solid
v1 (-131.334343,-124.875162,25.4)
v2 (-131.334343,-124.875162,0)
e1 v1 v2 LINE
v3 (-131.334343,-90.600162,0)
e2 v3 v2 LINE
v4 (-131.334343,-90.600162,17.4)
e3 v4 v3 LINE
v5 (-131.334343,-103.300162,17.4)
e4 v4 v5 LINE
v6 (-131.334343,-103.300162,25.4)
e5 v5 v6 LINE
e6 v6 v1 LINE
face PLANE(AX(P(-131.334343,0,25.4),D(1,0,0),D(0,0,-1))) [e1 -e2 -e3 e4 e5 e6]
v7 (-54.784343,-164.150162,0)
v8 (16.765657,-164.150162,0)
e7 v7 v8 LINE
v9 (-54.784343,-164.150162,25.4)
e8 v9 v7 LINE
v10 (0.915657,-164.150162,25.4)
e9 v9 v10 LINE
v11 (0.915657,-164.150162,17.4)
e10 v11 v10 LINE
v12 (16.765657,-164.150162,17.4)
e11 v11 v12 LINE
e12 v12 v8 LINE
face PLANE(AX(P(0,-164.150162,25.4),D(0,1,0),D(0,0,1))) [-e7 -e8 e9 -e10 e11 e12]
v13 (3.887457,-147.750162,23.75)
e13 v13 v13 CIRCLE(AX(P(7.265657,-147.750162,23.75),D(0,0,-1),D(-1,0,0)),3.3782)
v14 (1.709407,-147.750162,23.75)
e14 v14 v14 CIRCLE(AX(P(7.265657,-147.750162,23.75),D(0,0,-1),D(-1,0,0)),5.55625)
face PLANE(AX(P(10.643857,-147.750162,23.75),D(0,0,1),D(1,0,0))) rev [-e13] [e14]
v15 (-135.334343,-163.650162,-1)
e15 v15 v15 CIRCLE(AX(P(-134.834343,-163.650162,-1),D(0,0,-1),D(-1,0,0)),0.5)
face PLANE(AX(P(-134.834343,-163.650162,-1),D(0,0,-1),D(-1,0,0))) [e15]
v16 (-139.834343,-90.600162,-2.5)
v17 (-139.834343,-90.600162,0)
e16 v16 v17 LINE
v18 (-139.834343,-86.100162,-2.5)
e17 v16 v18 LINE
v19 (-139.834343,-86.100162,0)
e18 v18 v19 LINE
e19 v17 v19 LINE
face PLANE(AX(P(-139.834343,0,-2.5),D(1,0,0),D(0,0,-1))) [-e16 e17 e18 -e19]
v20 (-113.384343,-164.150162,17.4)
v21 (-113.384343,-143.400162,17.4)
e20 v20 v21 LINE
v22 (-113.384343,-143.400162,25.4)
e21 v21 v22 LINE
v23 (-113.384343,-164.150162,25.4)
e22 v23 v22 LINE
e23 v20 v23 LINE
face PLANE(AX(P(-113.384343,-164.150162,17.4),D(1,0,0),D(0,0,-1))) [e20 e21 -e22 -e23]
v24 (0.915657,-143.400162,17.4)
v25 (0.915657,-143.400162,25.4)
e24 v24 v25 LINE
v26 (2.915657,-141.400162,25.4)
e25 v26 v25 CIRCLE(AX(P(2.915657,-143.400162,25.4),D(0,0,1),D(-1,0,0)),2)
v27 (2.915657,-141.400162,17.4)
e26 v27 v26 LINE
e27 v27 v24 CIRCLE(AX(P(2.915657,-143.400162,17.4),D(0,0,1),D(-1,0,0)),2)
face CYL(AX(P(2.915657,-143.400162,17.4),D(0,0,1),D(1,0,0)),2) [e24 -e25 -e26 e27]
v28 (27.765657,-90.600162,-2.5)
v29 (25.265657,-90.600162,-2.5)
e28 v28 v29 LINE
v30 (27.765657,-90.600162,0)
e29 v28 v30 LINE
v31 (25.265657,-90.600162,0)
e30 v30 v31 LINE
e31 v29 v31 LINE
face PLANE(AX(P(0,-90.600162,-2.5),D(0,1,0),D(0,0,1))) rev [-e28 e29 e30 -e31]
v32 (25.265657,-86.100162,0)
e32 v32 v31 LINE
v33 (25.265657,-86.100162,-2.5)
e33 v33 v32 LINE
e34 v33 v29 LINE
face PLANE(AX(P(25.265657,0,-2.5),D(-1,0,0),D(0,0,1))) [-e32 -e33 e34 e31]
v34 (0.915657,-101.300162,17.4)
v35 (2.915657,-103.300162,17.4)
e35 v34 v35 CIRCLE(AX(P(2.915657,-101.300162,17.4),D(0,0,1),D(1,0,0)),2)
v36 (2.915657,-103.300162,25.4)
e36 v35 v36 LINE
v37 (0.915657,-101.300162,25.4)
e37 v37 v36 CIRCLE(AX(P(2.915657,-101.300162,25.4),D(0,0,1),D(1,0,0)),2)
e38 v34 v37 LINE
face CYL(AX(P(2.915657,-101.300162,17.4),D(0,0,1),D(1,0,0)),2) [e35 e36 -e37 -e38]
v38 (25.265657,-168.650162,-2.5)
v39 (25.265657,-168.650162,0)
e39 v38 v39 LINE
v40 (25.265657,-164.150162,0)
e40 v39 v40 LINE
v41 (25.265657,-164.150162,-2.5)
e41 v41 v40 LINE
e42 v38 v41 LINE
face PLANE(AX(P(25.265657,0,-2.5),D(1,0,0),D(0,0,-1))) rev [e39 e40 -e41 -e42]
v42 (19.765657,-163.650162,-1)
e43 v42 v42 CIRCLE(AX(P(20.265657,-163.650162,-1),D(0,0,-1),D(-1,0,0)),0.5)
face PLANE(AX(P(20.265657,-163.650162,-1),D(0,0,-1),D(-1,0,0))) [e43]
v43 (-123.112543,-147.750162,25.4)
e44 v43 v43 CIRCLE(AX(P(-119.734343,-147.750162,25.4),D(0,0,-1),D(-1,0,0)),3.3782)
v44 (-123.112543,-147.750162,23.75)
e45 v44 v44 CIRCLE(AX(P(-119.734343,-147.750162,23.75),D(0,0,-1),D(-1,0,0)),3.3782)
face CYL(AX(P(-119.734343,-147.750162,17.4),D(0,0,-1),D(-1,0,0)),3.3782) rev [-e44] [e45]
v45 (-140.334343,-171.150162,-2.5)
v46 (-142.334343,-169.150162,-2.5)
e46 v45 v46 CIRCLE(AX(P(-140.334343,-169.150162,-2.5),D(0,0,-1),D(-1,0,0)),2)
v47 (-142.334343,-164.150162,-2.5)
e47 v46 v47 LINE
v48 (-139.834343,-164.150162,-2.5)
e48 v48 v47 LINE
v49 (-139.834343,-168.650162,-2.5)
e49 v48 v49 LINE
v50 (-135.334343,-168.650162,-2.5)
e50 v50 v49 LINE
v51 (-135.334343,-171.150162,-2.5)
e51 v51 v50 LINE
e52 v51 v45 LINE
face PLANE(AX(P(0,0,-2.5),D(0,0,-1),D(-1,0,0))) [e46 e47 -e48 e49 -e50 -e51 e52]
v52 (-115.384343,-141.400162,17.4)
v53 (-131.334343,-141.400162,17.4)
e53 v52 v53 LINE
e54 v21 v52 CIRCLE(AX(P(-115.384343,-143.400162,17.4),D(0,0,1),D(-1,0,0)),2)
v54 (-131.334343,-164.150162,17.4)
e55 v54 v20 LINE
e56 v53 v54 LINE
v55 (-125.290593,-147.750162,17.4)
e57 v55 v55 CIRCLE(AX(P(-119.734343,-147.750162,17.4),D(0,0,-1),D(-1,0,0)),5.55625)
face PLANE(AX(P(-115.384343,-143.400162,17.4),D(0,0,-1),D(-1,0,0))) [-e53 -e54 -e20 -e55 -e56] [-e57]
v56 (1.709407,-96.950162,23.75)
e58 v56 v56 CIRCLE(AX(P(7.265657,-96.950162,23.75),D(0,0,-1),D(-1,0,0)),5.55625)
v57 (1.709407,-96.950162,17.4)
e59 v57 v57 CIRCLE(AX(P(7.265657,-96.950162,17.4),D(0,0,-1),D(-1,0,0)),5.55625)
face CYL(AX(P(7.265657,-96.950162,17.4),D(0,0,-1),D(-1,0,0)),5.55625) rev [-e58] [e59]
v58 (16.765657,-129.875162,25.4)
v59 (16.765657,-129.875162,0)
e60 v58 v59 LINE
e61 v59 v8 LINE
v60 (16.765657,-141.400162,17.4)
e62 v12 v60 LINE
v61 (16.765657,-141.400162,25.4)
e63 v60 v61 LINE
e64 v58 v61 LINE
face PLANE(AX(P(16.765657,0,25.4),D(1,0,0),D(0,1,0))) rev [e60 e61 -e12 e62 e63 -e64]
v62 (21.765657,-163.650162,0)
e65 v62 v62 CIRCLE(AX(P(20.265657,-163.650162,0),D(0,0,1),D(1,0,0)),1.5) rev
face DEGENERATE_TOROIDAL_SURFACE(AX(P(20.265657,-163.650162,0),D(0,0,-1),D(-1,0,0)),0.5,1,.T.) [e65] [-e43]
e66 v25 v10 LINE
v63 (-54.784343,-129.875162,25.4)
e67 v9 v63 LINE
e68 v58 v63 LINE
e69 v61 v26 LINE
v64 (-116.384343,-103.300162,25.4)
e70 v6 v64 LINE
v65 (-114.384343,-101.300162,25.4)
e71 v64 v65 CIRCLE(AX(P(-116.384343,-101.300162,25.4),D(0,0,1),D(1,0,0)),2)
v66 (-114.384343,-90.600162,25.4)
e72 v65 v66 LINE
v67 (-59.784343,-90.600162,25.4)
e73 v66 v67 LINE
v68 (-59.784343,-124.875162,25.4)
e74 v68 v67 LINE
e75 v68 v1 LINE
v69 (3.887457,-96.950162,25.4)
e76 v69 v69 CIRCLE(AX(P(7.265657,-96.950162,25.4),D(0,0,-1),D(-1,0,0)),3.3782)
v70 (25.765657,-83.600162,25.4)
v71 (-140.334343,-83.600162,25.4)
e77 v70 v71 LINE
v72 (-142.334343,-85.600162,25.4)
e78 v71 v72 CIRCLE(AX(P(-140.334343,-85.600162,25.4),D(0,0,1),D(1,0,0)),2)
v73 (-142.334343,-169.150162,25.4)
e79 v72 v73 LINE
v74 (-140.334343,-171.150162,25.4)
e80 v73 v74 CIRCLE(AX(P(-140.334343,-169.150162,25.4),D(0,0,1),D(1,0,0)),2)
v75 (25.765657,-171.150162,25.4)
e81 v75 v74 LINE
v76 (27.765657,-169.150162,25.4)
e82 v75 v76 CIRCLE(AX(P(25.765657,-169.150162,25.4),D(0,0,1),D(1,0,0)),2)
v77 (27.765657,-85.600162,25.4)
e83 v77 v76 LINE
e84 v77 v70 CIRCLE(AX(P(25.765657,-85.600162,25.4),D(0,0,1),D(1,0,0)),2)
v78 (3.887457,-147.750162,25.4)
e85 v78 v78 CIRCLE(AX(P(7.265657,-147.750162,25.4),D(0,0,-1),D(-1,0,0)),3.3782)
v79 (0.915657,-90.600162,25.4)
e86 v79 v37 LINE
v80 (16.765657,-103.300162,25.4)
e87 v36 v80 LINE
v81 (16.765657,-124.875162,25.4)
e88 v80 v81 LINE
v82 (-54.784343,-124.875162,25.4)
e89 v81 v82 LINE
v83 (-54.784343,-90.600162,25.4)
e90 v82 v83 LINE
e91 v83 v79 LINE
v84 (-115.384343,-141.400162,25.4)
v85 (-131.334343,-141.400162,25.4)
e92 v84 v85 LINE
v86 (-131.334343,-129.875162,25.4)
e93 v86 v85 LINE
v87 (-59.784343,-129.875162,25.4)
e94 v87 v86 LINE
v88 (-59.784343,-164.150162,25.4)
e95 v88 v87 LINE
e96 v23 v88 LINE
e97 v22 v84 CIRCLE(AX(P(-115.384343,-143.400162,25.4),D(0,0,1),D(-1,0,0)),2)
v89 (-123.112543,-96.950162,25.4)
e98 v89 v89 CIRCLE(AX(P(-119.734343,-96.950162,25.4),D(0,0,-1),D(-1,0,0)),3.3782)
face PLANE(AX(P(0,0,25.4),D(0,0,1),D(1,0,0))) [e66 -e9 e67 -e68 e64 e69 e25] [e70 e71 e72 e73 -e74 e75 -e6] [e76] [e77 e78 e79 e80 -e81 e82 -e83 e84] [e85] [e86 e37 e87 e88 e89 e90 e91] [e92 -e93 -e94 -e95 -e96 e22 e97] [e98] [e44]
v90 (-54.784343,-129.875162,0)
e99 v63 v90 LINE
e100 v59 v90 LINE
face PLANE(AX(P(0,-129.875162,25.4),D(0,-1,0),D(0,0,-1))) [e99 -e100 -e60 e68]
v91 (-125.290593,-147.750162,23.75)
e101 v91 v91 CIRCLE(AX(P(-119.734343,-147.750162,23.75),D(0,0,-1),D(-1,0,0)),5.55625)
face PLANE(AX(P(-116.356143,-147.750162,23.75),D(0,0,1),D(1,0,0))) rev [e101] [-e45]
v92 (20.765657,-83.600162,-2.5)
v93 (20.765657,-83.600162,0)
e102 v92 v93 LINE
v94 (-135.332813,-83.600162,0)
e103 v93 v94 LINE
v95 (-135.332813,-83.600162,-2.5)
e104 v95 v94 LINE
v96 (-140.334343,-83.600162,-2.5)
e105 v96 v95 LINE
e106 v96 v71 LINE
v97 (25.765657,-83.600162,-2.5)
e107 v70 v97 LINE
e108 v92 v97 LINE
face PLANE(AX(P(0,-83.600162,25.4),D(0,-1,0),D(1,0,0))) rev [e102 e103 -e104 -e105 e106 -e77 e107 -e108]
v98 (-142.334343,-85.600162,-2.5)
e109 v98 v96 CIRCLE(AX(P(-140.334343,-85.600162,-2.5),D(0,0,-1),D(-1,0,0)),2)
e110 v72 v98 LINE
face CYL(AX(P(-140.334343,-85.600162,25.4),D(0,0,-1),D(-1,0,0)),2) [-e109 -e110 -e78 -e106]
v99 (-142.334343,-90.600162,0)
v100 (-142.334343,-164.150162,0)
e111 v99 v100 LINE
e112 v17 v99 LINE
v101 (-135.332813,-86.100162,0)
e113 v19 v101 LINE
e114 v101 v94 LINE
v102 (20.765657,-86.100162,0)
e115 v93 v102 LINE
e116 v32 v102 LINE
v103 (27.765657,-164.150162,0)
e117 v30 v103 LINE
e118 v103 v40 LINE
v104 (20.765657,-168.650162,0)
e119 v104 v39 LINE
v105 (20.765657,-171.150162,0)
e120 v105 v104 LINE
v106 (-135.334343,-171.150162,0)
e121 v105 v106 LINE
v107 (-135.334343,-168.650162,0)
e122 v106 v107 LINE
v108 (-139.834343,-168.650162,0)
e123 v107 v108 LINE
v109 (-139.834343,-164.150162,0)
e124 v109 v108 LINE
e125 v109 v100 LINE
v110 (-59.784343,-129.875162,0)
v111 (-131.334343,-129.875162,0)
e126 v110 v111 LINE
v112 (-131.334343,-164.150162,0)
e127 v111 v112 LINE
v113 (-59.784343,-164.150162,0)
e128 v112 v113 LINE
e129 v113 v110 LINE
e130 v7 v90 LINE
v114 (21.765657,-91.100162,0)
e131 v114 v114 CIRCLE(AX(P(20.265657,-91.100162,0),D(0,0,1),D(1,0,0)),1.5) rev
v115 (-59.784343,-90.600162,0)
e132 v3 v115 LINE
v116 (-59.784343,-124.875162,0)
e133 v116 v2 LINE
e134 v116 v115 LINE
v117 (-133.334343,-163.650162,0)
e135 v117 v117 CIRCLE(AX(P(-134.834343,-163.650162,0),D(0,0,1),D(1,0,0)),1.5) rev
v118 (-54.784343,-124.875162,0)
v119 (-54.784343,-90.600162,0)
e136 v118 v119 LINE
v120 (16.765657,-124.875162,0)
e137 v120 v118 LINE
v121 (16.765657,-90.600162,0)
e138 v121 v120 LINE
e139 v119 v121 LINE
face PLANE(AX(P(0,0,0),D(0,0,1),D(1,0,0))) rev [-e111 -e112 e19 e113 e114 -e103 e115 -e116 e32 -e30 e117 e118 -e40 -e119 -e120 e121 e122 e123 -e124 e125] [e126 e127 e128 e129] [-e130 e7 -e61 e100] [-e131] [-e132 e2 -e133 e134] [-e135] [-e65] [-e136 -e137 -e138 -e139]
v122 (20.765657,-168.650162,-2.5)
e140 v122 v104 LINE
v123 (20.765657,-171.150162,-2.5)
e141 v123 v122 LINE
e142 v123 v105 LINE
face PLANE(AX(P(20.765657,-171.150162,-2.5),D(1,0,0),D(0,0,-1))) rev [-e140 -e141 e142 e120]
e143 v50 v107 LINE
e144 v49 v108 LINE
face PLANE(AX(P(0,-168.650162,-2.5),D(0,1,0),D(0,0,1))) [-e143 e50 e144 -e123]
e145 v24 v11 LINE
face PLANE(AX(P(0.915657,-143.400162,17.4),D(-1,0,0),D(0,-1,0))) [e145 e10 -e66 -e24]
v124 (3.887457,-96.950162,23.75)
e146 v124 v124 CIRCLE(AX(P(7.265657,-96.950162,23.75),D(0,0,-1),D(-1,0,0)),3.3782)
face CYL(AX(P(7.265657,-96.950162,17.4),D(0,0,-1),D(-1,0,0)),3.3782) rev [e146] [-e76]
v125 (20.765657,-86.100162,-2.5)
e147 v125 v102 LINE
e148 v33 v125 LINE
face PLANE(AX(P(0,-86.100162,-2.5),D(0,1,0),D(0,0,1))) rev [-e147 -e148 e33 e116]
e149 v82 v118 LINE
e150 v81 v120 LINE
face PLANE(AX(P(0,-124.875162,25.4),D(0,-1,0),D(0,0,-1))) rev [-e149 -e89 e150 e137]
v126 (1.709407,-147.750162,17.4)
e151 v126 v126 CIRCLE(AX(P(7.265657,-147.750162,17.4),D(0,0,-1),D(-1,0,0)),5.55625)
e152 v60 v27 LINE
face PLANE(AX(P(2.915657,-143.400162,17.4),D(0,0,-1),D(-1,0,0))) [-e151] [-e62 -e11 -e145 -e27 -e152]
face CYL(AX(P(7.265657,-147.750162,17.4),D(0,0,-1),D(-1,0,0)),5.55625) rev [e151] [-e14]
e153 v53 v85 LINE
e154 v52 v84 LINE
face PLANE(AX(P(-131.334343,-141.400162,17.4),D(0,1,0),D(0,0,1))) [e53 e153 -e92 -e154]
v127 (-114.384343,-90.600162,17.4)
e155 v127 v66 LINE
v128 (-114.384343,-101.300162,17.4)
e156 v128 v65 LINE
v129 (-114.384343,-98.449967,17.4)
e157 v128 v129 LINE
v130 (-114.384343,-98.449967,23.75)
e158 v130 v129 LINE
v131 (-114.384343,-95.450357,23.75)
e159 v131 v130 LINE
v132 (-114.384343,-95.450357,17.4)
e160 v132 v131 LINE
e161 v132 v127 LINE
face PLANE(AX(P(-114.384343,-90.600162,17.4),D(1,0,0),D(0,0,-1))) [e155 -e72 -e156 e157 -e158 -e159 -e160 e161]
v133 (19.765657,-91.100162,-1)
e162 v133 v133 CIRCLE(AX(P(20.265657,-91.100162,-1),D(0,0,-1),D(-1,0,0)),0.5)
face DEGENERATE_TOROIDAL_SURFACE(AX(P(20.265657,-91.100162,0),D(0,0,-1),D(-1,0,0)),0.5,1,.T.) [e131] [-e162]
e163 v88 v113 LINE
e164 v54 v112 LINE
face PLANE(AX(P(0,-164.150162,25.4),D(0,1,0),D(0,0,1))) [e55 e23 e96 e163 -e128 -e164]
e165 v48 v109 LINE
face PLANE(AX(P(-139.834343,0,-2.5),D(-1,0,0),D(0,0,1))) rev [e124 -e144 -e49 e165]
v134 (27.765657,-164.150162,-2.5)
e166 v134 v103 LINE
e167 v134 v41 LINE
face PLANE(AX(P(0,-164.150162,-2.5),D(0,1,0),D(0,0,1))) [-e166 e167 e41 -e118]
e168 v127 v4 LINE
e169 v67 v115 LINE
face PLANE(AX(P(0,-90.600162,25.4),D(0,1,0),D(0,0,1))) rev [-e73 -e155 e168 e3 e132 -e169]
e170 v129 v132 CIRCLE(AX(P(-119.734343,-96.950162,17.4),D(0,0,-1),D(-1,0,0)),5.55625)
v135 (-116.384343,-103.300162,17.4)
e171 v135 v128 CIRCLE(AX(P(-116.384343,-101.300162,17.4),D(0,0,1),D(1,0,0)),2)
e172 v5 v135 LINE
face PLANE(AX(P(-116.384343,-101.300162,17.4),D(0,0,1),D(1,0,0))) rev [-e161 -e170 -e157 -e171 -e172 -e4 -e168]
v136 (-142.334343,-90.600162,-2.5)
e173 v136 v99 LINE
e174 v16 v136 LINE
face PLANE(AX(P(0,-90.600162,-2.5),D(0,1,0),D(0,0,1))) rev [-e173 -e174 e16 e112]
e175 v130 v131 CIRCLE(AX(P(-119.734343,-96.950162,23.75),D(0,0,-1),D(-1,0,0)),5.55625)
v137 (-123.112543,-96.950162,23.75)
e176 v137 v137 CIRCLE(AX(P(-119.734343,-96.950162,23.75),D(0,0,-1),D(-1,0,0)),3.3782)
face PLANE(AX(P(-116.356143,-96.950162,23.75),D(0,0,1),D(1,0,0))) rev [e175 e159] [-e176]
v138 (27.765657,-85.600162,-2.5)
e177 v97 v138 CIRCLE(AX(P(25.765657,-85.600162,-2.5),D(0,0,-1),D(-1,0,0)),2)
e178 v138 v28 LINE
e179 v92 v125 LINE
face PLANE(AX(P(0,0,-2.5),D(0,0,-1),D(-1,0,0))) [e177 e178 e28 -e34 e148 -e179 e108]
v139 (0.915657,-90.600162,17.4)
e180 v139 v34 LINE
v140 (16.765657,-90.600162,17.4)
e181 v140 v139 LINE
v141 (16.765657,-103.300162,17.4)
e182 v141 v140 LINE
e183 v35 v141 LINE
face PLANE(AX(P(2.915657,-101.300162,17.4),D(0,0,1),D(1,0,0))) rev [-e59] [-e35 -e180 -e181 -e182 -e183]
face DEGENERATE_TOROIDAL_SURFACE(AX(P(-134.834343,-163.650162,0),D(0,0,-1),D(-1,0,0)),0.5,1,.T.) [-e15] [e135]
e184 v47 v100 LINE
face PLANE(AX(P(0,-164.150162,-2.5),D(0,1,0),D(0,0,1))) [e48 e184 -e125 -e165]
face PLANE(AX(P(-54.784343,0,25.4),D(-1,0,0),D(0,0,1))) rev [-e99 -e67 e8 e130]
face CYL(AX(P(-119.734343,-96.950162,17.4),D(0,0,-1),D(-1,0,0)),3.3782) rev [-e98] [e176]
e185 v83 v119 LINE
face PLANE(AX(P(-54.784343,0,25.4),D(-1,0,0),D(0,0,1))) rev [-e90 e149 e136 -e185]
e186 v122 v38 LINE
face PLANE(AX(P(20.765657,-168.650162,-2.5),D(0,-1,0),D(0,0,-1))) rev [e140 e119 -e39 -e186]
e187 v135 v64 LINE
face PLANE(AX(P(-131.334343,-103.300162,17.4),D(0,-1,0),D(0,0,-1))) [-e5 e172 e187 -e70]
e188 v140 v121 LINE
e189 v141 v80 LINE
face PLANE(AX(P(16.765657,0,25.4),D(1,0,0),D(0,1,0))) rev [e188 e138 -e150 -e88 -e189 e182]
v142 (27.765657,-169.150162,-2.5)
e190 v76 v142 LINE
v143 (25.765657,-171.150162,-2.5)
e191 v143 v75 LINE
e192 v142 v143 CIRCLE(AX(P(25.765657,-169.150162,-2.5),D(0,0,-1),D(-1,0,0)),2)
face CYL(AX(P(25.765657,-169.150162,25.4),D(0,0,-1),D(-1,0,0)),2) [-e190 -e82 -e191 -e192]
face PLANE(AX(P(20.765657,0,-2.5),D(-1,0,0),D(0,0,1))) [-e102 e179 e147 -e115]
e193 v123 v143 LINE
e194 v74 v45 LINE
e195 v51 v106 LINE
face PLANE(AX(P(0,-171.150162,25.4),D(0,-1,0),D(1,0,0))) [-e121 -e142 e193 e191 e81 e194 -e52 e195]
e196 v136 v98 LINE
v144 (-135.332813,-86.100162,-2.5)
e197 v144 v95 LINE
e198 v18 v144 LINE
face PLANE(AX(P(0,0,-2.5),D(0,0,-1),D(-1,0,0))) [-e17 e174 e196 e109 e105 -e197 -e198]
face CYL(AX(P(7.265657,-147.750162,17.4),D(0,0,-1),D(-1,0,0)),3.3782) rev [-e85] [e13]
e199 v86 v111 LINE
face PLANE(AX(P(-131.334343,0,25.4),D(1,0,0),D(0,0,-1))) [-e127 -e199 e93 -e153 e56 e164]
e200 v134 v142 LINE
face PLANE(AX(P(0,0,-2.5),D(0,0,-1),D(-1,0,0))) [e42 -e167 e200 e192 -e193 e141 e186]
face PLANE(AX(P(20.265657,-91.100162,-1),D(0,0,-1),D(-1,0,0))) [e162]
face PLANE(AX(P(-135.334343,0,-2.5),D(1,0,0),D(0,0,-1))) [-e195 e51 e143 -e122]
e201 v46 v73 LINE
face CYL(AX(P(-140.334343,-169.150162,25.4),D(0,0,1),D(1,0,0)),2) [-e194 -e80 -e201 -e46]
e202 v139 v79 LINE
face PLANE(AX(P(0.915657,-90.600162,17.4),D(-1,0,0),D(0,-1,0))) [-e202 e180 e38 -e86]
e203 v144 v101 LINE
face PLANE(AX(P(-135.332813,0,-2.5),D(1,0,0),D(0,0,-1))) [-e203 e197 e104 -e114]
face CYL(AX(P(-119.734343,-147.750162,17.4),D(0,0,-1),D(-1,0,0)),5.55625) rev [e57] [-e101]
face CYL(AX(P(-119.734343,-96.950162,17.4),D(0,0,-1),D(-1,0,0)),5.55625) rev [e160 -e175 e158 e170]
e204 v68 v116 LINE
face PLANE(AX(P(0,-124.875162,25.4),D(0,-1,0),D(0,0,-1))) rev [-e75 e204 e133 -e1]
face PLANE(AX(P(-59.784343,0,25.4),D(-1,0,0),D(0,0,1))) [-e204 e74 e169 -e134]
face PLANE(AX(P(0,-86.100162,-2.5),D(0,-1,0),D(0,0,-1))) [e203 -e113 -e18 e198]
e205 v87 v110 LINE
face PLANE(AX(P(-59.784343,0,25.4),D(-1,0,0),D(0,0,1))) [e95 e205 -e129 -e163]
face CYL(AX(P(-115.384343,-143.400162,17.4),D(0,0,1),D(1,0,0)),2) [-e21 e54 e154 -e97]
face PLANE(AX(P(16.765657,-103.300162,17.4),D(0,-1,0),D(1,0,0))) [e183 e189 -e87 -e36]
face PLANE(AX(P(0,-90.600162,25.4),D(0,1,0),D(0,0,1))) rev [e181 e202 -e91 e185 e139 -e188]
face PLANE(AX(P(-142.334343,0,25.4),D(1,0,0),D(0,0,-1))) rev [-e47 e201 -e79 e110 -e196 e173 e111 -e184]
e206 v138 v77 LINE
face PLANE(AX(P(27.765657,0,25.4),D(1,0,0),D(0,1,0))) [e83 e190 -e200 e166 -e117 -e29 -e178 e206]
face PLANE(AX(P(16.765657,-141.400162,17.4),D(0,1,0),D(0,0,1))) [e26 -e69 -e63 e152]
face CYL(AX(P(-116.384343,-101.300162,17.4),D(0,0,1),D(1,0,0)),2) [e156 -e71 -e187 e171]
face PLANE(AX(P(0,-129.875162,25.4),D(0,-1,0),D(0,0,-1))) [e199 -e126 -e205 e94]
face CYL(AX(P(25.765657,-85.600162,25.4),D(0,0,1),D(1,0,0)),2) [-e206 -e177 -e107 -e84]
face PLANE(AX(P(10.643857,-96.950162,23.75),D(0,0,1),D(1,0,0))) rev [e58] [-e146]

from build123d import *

# Parameters (mm, degrees)
SKETCH1_W                                        = 170.1
SKETCH1_H                                        = 87.55
SKETCH1_W_2                                      = 148.1
SKETCH1_H_2                                      = 73.55
SKETCH1_W_3                                      = 71.55
SKETCH1_H_3                                      = 5
SKETCH1_W_4                                      = 5
SKETCH1_H_4                                      = 34.275
BOSS_EXTRUDE1_DEPTH                              = 25.4
SKETCH2_W                                        = 2.5
SKETCH2_H                                        = 4.5
SKETCH2_W_2                                      = 4.501529918
SKETCH2_H_2                                      = 2.5
SKETCH2_W_3                                      = 4.5
BOSS_EXTRUDE2_DEPTH                              = 2.5
SKETCH3_R                                        = 1.5
BOSS_EXTRUDE3_DEPTH                              = 1
BOSS_EXTRUDE4_DEPTH                              = 8
CBORE_FOR_1_4_SOCKET_HEAD_CAP_SCREW1_D           = 6.7564
CBORE_FOR_1_4_SOCKET_HEAD_CAP_SCREW1_CBORE_D     = 11.1125
CBORE_FOR_1_4_SOCKET_HEAD_CAP_SCREW1_CBORE_DEPTH = 6.35
FILLET1_R                                        = 1
FILLET2_R                                        = 2


with BuildPart() as part:
    # Sketch1 → Boss-Extrude1 (new body)
    # profile 1 of 6: a face of its own
    with BuildSketch(Plane.XY):
        with Locations((-57.284342841, -127.375162174)):
            Rectangle(SKETCH1_W, SKETCH1_H)
        with Locations((-57.284342841, -127.375162174)):
            Rectangle(SKETCH1_W_2, SKETCH1_H_2, mode=Mode.SUBTRACT)
    # profile 2 of 6: a face of its own
    with BuildSketch(Plane.XY):
        with Locations((-95.559342841, -127.375162174)):
            Rectangle(SKETCH1_W_3, SKETCH1_H_3)
    # profile 3 of 6: a face of its own
    with BuildSketch(Plane.XY):
        with Locations((-57.284342841, -107.737662174)):
            Rectangle(SKETCH1_W_4, SKETCH1_H_4)
    # profile 4 of 6: a face of its own
    with BuildSketch(Plane.XY):
        with Locations((-19.009342841, -127.375162174)):
            Rectangle(SKETCH1_W_3, SKETCH1_H_3)
    # profile 5 of 6: a face of its own
    with BuildSketch(Plane.XY):
        with Locations((-57.284342841, -147.012662174)):
            Rectangle(SKETCH1_W_4, SKETCH1_H_4)
    # profile 6 of 6: a face of its own
    with BuildSketch(Plane.XY):
        with Locations((-57.284342841, -127.375162174)):
            Rectangle(SKETCH1_W_4, SKETCH1_H_3)
    extrude(amount=BOSS_EXTRUDE1_DEPTH)

    # Sketch2 → Boss-Extrude2 (add)
    with BuildSketch(Plane(origin=(0, 0, 0), x_dir=(-1, 0, 0), z_dir=(0, 0, -1))):
        Polygon((135.334342841, -168.650162174), (135.334342841, -171.150162174), (142.334342841, -171.150162174), (142.334342841, -168.650162174), (139.834342841, -168.650162174), align=None)
        with Locations((141.084342841, -166.400162174)):
            Rectangle(SKETCH2_W, SKETCH2_H)
        Polygon((139.834342841, -90.600162174), (142.334342841, -90.600162174), (142.334342841, -83.600162174), (139.834342841, -83.600162174), (139.834342841, -86.100162174), align=None)
        with Locations((137.583577882, -84.850162174)):
            Rectangle(SKETCH2_W_2, SKETCH2_H_2)
        Polygon((-27.765657159, -83.600162174), (-27.765657159, -90.600162174), (-25.265657159, -90.600162174), (-25.265657159, -86.100162174), (-25.265657159, -83.600162174), align=None)
        with Locations((-23.015657159, -84.850162174)):
            Rectangle(SKETCH2_W_3, SKETCH2_H_2)
        Polygon((-27.765657159, -164.150162174), (-27.765657159, -171.150162174), (-25.265657159, -171.150162174), (-25.265657159, -168.650162174), (-25.265657159, -164.150162174), align=None)
        with Locations((-23.015657159, -169.900162174)):
            Rectangle(SKETCH2_W_3, SKETCH2_H_2)
    extrude(amount=BOSS_EXTRUDE2_DEPTH)

    # Sketch3 → Boss-Extrude3 (add)
    with BuildSketch(Plane(origin=(0, 0, 0), x_dir=(-1, 0, 0), z_dir=(0, 0, -1))):
        with Locations(Location((-20.265657159, -163.650162174, 0), (0, 0, 180))):
            Circle(SKETCH3_R)
        with Locations(Location((-20.265657159, -91.100162174, 0), (0, 0, 180))):
            Circle(SKETCH3_R)
        with Locations(Location((134.834342841, -163.650162174, 0), (0, 0, 180))):
            Circle(SKETCH3_R)
    extrude(amount=BOSS_EXTRUDE3_DEPTH)

    # Sketch4 → Boss-Extrude4 (add)
    with BuildSketch(Plane.XY.offset(25.4)):
        with BuildLine():
            Line((16.765657159, -90.600162174), (0.915657159, -90.600162174))
            Line((0.915657159, -90.600162174), (0.915657159, -101.300162174))
            ThreePointArc((0.915657159, -101.300162174), (1.501443597, -102.714375736), (2.915657159, -103.300162174))
            Line((2.915657159, -103.300162174), (16.765657159, -103.300162174))
            Line((16.765657159, -103.300162174), (16.765657159, -90.600162174))
        make_face()
        with BuildLine():
            Line((-131.334342841, -164.150162174), (-113.384342841, -164.150162174))
            Line((-113.384342841, -164.150162174), (-113.384342841, -143.400162174))
            ThreePointArc((-113.384342841, -143.400162174), (-113.970129278, -141.985948611), (-115.384342841, -141.400162174))
            Line((-115.384342841, -141.400162174), (-131.334342841, -141.400162174))
            Line((-131.334342841, -141.400162174), (-131.334342841, -164.150162174))
        make_face()
        with BuildLine():
            Line((-131.334342841, -90.600162174), (-114.384342841, -90.600162174))
            Line((-114.384342841, -90.600162174), (-114.384342841, -101.300162174))
            ThreePointArc((-114.384342841, -101.300162174), (-114.970129278, -102.714375736), (-116.384342841, -103.300162174))
            Line((-116.384342841, -103.300162174), (-131.334342841, -103.300162174))
            Line((-131.334342841, -103.300162174), (-131.334342841, -90.600162174))
        make_face()
        with BuildLine():
            Line((16.765657159, -141.400162174), (2.915657159, -141.400162174))
            ThreePointArc((2.915657159, -141.400162174), (1.501443597, -141.985948611), (0.915657159, -143.400162174))
            Line((0.915657159, -143.400162174), (0.915657159, -164.150162174))
            Line((0.915657159, -164.150162174), (16.765657159, -164.150162174))
            Line((16.765657159, -164.150162174), (16.765657159, -141.400162174))
        make_face()
    extrude(amount=-BOSS_EXTRUDE4_DEPTH)

    # CBORE for 1/4 Socket Head Cap Screw1 (through all)
    with Locations(Plane(origin=(0, 0, 17.4), x_dir=(-1, 0, 0), z_dir=(0, 0, -1))):
        with Locations((-7.265657159, -147.750162174), (-7.265657159, -96.950162174), (119.734342841, -96.950162174), (119.734342841, -147.750162174)):
            CounterBoreHole(CBORE_FOR_1_4_SOCKET_HEAD_CAP_SCREW1_D / 2, CBORE_FOR_1_4_SOCKET_HEAD_CAP_SCREW1_CBORE_D / 2, CBORE_FOR_1_4_SOCKET_HEAD_CAP_SCREW1_CBORE_DEPTH)

    # Fillet1
    fillet1_edges = [part.edges().sort_by_distance(p)[0] for p in [
        (18.765657159, -163.650162174, -1),
        (18.765657159, -91.100162174, -1),
        (-136.334342841, -163.650162174, -1),
    ]]
    fillet(fillet1_edges, radius=FILLET1_R - 0.0001)  # a hair under: the kernel refuses the full size

    # Fillet2
    fillet2_edges = [part.edges().sort_by_distance(p)[0] for p in [
        (27.765657159, -83.600162174, 11.45),
        (27.765657159, -171.150162174, 11.45),
        (-142.334342841, -171.150162174, 11.45),
        (-142.334342841, -83.600162174, 11.45),
    ]]
    fillet(fillet2_edges, radius=FILLET2_R)


solid = part.part
